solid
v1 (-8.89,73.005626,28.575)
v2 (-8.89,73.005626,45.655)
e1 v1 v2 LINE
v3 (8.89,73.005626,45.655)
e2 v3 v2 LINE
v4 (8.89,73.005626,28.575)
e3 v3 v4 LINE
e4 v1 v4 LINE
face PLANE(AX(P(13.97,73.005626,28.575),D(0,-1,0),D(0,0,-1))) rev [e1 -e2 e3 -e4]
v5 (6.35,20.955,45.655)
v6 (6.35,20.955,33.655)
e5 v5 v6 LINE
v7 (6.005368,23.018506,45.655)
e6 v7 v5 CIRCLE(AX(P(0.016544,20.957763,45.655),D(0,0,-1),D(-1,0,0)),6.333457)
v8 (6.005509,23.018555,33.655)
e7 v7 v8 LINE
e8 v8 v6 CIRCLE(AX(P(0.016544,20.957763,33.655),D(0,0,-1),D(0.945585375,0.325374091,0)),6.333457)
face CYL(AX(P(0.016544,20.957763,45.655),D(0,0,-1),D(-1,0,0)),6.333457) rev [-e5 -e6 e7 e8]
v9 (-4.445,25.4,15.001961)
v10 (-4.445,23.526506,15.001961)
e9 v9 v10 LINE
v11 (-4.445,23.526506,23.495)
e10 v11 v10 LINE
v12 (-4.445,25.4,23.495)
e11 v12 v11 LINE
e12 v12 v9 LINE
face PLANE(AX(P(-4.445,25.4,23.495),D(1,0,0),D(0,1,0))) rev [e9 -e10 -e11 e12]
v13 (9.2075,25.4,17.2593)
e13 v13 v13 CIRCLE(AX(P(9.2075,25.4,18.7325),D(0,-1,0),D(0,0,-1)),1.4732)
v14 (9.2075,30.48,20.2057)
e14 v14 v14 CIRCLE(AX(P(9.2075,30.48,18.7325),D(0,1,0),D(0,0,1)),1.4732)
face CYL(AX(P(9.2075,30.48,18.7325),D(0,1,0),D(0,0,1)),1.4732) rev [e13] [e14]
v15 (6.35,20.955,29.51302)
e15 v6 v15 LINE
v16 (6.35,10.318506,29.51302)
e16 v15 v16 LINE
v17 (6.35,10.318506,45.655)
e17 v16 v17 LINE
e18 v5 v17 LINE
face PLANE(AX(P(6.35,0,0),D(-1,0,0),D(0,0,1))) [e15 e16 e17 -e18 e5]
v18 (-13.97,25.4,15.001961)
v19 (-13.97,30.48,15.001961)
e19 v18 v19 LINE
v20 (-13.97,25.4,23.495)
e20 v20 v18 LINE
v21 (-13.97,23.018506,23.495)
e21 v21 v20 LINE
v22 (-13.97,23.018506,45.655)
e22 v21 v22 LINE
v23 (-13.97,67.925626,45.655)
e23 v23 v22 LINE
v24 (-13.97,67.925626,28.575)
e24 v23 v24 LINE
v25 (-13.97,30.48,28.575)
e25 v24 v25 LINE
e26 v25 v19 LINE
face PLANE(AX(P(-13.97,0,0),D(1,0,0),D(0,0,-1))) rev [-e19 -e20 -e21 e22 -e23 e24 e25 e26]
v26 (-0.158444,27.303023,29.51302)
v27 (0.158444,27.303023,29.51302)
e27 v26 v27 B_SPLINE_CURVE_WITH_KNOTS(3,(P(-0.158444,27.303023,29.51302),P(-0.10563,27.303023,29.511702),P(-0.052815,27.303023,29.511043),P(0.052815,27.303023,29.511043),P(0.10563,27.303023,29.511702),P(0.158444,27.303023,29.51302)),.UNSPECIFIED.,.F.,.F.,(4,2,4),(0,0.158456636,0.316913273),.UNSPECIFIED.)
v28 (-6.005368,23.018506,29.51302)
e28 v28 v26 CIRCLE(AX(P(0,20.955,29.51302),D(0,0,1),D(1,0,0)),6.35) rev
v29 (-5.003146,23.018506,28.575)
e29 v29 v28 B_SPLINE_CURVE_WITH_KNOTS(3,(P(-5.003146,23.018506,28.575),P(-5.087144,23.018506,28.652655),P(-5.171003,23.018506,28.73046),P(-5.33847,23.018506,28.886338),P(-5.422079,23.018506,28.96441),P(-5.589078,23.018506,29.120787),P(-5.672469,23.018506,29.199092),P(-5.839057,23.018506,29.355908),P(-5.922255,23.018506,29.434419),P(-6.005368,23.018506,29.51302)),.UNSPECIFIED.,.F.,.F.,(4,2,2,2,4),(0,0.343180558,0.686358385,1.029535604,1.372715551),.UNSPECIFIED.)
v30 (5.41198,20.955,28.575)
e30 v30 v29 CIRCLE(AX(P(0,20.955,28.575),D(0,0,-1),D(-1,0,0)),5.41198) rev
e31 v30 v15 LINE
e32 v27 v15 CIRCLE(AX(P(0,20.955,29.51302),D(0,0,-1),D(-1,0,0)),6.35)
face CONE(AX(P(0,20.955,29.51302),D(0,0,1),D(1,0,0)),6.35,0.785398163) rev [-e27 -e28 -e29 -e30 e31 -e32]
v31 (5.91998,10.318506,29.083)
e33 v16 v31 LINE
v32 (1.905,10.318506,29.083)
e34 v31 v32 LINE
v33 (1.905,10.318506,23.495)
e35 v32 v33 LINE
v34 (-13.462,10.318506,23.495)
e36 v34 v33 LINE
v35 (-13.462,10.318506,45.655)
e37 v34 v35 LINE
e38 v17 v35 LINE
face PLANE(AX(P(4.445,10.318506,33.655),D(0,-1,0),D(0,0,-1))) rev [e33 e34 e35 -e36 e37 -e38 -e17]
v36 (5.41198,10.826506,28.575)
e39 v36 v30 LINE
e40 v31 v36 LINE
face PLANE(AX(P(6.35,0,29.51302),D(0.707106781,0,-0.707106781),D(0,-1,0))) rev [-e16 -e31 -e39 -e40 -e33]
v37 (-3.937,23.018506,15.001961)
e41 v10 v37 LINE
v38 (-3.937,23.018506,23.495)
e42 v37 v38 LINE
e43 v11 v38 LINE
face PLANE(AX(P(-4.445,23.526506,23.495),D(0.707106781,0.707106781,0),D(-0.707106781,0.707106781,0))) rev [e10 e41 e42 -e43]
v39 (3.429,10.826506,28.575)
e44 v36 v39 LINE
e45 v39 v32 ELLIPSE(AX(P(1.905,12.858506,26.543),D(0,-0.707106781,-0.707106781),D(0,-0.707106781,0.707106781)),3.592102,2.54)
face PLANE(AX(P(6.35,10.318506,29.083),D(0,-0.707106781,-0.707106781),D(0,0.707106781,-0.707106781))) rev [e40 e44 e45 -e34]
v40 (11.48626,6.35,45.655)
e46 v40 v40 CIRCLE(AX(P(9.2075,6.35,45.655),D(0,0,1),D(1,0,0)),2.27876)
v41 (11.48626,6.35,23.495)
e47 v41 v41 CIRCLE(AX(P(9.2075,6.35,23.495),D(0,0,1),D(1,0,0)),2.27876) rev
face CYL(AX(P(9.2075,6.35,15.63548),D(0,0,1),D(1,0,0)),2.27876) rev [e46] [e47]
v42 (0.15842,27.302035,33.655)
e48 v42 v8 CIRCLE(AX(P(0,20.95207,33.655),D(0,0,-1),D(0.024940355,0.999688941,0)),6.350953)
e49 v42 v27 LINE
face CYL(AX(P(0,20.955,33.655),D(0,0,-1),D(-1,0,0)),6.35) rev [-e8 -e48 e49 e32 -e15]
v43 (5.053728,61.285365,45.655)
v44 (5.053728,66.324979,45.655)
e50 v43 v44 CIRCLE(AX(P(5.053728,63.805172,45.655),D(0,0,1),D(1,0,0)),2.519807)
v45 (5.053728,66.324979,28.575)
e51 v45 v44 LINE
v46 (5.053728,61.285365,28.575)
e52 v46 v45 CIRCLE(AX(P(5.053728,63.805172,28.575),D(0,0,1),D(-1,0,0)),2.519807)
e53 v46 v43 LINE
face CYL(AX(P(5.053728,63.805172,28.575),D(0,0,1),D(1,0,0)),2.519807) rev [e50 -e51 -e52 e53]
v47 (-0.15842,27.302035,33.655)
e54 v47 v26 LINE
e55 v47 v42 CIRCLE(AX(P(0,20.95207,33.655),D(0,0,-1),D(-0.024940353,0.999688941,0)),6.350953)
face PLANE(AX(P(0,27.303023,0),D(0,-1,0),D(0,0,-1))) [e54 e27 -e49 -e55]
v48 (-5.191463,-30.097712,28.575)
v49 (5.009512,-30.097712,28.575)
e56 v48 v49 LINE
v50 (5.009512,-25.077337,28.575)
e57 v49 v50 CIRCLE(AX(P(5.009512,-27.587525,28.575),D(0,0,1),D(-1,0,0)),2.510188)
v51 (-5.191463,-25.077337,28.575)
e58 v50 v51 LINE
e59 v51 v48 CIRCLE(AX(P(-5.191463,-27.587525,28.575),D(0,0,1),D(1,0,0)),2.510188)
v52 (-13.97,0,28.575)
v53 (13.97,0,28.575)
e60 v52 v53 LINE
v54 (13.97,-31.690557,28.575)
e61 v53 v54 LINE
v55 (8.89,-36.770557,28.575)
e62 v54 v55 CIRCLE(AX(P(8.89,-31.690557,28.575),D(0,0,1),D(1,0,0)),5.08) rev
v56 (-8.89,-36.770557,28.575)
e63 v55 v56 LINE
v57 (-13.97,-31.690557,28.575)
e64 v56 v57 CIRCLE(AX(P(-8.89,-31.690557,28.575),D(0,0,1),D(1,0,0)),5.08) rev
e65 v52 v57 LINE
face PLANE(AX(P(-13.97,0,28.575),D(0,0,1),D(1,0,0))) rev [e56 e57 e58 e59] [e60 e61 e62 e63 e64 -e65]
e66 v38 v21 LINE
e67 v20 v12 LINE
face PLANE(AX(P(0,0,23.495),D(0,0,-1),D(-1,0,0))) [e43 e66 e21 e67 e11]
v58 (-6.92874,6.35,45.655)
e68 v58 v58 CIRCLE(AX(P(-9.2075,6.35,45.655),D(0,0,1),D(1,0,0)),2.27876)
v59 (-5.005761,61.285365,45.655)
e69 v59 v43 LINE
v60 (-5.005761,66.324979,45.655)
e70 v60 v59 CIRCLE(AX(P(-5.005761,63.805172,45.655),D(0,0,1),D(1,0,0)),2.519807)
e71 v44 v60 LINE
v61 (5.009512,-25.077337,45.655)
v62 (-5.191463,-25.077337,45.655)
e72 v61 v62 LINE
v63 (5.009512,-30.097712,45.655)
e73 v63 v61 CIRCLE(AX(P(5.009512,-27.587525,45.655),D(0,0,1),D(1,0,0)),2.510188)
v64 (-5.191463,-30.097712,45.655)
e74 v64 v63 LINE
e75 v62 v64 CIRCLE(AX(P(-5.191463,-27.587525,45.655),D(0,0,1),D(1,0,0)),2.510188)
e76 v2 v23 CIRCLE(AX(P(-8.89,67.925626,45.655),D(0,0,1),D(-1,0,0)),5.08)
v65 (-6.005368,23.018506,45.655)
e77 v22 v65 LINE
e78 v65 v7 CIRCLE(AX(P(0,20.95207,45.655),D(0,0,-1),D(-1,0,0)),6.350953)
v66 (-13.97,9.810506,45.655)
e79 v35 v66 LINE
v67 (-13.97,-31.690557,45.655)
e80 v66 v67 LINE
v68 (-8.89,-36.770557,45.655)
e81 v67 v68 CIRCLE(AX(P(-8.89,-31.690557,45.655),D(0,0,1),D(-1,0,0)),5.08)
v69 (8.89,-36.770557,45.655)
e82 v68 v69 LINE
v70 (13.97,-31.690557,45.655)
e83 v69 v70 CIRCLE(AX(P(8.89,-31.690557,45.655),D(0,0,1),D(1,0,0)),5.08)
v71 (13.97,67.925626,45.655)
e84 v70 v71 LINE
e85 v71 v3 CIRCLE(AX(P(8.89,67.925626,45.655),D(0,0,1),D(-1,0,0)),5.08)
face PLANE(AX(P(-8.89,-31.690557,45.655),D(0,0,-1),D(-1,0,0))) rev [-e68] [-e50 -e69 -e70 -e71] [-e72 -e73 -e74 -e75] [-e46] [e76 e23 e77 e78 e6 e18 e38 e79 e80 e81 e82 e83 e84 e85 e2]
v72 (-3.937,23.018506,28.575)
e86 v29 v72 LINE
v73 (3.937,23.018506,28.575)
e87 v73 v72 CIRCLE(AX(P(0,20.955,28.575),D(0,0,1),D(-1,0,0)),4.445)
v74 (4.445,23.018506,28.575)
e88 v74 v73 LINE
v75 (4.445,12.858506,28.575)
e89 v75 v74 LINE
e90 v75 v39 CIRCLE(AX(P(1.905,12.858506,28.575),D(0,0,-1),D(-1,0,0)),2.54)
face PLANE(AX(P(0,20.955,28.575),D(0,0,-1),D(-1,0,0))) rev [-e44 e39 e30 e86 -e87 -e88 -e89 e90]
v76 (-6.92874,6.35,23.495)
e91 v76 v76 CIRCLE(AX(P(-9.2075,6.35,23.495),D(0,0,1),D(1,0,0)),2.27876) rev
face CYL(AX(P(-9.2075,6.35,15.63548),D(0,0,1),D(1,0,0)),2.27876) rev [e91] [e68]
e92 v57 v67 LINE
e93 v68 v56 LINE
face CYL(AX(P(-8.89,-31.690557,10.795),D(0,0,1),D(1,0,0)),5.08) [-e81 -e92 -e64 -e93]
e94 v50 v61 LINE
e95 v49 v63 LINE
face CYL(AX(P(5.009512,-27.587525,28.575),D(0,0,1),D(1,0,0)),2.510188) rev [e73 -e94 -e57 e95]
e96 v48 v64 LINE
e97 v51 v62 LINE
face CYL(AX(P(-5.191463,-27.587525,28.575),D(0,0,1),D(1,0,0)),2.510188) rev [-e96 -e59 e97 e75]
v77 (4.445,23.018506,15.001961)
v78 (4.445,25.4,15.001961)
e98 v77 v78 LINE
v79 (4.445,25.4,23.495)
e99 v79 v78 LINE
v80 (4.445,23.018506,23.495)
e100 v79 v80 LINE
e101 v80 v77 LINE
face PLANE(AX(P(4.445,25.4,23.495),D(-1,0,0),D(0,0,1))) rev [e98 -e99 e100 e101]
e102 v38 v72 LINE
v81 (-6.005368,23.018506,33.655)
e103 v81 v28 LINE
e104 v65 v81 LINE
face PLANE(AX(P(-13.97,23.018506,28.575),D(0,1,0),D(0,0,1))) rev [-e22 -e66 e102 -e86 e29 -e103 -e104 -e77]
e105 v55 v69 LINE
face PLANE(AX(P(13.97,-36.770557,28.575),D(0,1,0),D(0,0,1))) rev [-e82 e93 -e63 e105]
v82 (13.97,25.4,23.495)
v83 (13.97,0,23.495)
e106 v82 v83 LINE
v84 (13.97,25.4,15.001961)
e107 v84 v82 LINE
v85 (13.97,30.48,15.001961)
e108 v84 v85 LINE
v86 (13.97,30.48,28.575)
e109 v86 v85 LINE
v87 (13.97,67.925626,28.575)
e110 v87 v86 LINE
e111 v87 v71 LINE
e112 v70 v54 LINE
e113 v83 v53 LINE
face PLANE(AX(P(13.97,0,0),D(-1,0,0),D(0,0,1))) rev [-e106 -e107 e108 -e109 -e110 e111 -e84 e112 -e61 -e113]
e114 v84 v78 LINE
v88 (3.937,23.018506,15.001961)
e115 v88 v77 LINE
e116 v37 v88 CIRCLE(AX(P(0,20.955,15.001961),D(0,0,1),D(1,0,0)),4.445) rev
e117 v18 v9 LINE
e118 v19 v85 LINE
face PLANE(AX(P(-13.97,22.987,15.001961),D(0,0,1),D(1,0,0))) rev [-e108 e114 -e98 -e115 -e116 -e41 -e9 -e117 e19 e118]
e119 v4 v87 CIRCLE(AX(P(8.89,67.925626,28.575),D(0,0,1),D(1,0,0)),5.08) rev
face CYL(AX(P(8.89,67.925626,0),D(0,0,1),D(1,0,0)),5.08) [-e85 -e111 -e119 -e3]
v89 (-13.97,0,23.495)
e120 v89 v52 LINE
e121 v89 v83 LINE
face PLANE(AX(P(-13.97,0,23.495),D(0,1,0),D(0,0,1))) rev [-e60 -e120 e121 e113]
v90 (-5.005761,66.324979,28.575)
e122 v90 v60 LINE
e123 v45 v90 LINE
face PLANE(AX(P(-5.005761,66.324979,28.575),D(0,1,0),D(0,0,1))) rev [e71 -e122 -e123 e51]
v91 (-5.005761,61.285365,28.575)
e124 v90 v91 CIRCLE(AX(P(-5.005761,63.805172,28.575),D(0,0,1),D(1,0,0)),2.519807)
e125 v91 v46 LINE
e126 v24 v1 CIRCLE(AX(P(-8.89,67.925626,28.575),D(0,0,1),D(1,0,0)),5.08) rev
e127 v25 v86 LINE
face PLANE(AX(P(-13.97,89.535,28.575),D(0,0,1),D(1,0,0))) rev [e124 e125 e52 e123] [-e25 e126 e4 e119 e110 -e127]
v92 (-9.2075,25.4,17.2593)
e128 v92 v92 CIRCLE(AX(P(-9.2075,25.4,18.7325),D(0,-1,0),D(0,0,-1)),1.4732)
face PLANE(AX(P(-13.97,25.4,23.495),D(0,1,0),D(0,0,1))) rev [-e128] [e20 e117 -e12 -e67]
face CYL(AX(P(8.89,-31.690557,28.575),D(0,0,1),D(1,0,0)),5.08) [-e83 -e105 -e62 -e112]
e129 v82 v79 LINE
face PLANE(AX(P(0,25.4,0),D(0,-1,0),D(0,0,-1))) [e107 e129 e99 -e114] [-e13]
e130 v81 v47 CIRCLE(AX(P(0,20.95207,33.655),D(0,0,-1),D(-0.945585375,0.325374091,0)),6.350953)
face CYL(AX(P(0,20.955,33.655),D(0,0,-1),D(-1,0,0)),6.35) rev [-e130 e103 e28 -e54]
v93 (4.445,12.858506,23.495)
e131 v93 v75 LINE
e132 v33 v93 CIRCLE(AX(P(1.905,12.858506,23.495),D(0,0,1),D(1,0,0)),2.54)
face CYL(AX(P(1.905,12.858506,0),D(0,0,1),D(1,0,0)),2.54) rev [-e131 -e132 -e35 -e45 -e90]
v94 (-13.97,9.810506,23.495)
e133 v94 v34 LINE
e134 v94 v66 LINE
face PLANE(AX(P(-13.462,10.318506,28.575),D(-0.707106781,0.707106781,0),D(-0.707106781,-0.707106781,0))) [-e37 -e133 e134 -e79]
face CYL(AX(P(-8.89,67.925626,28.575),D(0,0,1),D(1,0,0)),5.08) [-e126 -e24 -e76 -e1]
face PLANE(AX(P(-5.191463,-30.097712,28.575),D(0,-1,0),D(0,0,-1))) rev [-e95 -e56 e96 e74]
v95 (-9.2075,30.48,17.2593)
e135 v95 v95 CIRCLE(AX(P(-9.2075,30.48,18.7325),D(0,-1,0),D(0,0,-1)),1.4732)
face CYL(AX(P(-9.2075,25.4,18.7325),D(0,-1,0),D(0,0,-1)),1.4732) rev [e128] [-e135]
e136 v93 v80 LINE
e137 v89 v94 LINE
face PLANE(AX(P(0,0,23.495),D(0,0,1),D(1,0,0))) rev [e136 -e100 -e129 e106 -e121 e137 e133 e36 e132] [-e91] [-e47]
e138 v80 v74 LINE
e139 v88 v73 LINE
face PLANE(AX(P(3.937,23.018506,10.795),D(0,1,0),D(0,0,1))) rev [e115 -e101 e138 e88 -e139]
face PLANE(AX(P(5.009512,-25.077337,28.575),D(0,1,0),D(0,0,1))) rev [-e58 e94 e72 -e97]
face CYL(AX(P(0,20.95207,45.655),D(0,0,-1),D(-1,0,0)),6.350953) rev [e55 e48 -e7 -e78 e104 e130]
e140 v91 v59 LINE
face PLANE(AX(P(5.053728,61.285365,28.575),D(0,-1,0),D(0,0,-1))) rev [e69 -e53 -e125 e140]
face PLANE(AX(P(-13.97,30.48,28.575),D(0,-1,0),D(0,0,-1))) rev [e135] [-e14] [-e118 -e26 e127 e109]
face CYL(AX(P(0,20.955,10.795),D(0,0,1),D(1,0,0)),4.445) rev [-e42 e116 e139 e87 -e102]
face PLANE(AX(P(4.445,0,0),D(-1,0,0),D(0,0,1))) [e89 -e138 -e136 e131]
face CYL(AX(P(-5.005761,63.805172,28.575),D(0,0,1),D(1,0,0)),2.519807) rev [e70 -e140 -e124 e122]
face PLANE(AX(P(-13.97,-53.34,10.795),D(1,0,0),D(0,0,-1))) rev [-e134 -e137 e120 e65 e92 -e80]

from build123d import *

# Parameters (mm, degrees)
BOSS_EXTRUDE1_DEPTH                                = 5.080000000000001
SKETCH2_W                                          = 5.079999999999998
SKETCH2_H                                          = 0.5079999999999831
BOSS_EXTRUDE2_DEPTH                                = 17.907000000000004
BOSS_EXTRUDE3_DEPTH                                = 1.9049999999999987
BOSS_EXTRUDE4_DEPTH                                = 17.779999999999998
SKETCH5_W                                          = 20.31999999999999
SKETCH5_H                                          = 22.859999999999992
BOSS_EXTRUDE5_DEPTH                                = 63.1505057547775
BOSS_EXTRUDE6_DEPTH                                = 10.03299999999999
BOSS_EXTRUDE7_DEPTH                                = 5.079999999999997
SKETCH8_W                                          = 22.859999999999992
SKETCH8_H                                          = 80.6430229523153
BOSS_EXTRUDE8_DEPTH                                = 7.619999999999997
CUT_EXTRUDE1_DEPTH                                 = 12.699999999999996
CUT_EXTRUDE2_DEPTH                                 = 12.699999999999998
BOSS_EXTRUDE9_DEPTH                                = 5.079999999999997
BOSS_EXTRUDE10_DEPTH                               = 62.23197704768469
SKETCH13_W                                         = 9.524999999999991
SKETCH13_H                                         = 12.699999999999998
CUT_EXTRUDE3_DEPTH                                 = 2.381494245222503
SKETCH14_W                                         = 17.779999999999994
SKETCH14_H                                         = 59.05499999999999
CUT_EXTRUDE4_DEPTH                                 = 100.64847640581364
SKETCH15_W                                         = 5.079999999999998
SKETCH15_H                                         = 53.339999999999996
CUT_EXTRUDE5_DEPTH                                 = 100.64847640581364
CUT_EXTRUDE6_DEPTH                                 = 93.34611808300336
CUT_EXTRUDE7_DEPTH                                 = 94.45724543875664
CUT_EXTRUDE8_DEPTH                                 = 93.34611808300336
CUT_EXTRUDE9_DEPTH                                 = 93.34611808300336
CBORE_FOR_M2_5_HEX_HEAD_MACHINE_SCREW1_D           = 2.9464
CBORE_FOR_M2_5_HEX_HEAD_MACHINE_SCREW1_DEPTH       = 22.86
CBORE_FOR_M2_5_HEX_HEAD_MACHINE_SCREW1_CBORE_D     = 5.55752
CBORE_FOR_M2_5_HEX_HEAD_MACHINE_SCREW1_CBORE_DEPTH = 2.8448
M2_5_CLEARANCE_HOLE1_D                             = 2.9464
M2_5_CLEARANCE_HOLE1_DEPTH                         = 83.82
M2_5_CLEARANCE_HOLE2_D                             = 2.9464
M2_5_CLEARANCE_HOLE2_DEPTH                         = 64.135
FILLET2_R                                          = 2.540000000000001
CHAMFER2_SIZE                                      = 0.938019803
FILLET3_R                                          = 5.079999999999999
BOSS_EXTRUDE16_DEPTH                               = 5.080000000000002
SKETCH33_W                                         = 27.93999999999999
SKETCH33_H                                         = 16.56944292798444
CUT_EXTRUDE10_DEPTH                                = 5.080000000000002
BOSS_EXTRUDE17_START                               = -5.080000000000002
BOSS_EXTRUDE17_DEPTH                               = 5.080000000000002
SKETCH35_W                                         = 27.940000000000005
SKETCH35_H                                         = 16.529374070210466
CUT_EXTRUDE11_DEPTH                                = 5.08
CUT_EXTRUDE12_DEPTH                                = 5.08
FILLET4_R                                          = 5.08
FILLET5_R                                          = 5.08
FILLET6_R                                          = 5.08
FILLET7_R                                          = 5.08
CUT_EXTRUDE13_DEPTH                                = 5.08
SKETCH39_W                                         = 27.940000000000005
SKETCH39_H                                         = 3.5882356704365357
CUT_EXTRUDE14_DEPTH                                = 7.492999999999999
SKETCH40_W                                         = 27.940000000000005
SKETCH40_H                                         = 0.6187251467707799
CUT_EXTRUDE15_DEPTH                                = 7.492999999999999
BOSS_EXTRUDE18_START                               = 12
SKETCH41_R                                         = 2.7787599999999943
BOSS_EXTRUDE18_DEPTH                               = 12
SKETCH42_R                                         = 2.7787599999999943
CUT_EXTRUDE16_DEPTH                                = 32.512
SKETCH43_R                                         = 2.7787599999999935
SKETCH43_R_2                                       = 2.2787599999999935
SKETCH43_R_3                                       = 2.7787599999999943
BOSS_EXTRUDE19_DEPTH                               = 22.16


with BuildPart() as part:
    # Sketch1 → Boss-Extrude1 (new body)
    with BuildSketch(Plane.XY.offset(33.654999999999994)):
        Polygon((-13.96999999999999, 9.810505754777516), (-13.461999999999998, 9.810505754777516), (-13.461999999999998, 10.3185057547775), align=None)
    extrude(amount=-BOSS_EXTRUDE1_DEPTH)

    # Sketch2 → Boss-Extrude2 (add)
    with BuildSketch(Plane(origin=(-13.461999999999998, 0, 0), x_dir=(0, 0, -1), z_dir=(1, 0, 0))):
        with Locations((-31.114999999999995, 10.064505754777507)):
            Rectangle(SKETCH2_W, SKETCH2_H)
    extrude(amount=BOSS_EXTRUDE2_DEPTH)

    # Sketch3 → Boss-Extrude3 (add)
    with BuildSketch(Plane(origin=(4.445000000000005, 0, 0), x_dir=(0, 0, -1), z_dir=(1, 0, 0))):
        Polygon((-28.574999999999996, 9.810505754777516), (-33.654999999999994, 9.810505754777516), (-33.654999999999994, 10.3185057547775), (-29.083000000000002, 10.3185057547775), (-28.574999999999996, 10.826505754777498), align=None)
    extrude(amount=BOSS_EXTRUDE3_DEPTH)

    # Sketch4 → Boss-Extrude4 (add)
    with BuildSketch(Plane(origin=(0, 0, 28.574999999999996), x_dir=(-1, 0, 0), z_dir=(0, 0, -1))):
        with BuildLine():
            Line((-6.3500000000000005, 9.810505754777516), (-6.349999999999998, 27.303022952315306))
            Line((-6.349999999999998, 27.303022952315306), (3.93700000000001, 27.303022952315306))
            Line((3.93700000000001, 27.303022952315306), (3.93700000000001, 23.0185057547775))
            ThreePointArc((3.93700000000001, 23.0185057547775), (-2.14e-15, 25.399999999999995), (-3.9370000000000167, 23.0185057547775))
            Line((-3.9370000000000167, 23.0185057547775), (-4.445000000000012, 23.0185057547775))
            Line((-4.445000000000012, 23.0185057547775), (-4.445000000000001, 10.3185057547775))
            Line((-4.445000000000001, 10.3185057547775), (13.46200000000004, 10.3185057547775))
            Line((13.46200000000004, 10.3185057547775), (13.969999999999992, 9.810505754777516))
            Line((13.969999999999992, 9.810505754777516), (-6.3500000000000005, 9.810505754777516))
        make_face()
    extrude(amount=BOSS_EXTRUDE4_DEPTH)

    # Sketch5 → Boss-Extrude5 (add)
    with BuildSketch(Plane.XZ.offset(-9.810505754777516)):
        with Locations((-3.8099999999999947, 22.224999999999998)):
            Rectangle(SKETCH5_W, SKETCH5_H)
    extrude(amount=BOSS_EXTRUDE5_DEPTH)

    # Sketch6 → Boss-Extrude6 (add)
    with BuildSketch(Plane.ZY.offset(3.93700000000001)):
        Polygon((28.575, 23.0185057547775), (10.795, 23.0185057547775), (10.794999999999998, 27.303022952315306), (28.575, 27.303022952315306), align=None)
    extrude(amount=BOSS_EXTRUDE6_DEPTH)

    # Sketch7 → Boss-Extrude7 (add)
    with BuildSketch(Plane.XY.offset(28.574999999999996)):
        with BuildLine():
            Line((0.15844430213195376, 27.303022952315306), (6.3500000000000005, 27.303022952315306))
            Line((6.3500000000000005, 27.303022952315306), (6.3500000000000005, 20.955000000000002))
            ThreePointArc((6.3500000000000005, 20.955000000000002), (4.545801432010527, 25.38875566994067), (0.15844430213195376, 27.303022952315306))
        make_face()
    extrude(amount=BOSS_EXTRUDE7_DEPTH)

    # Sketch8 → Boss-Extrude8 (add)
    with BuildSketch(Plane(origin=(6.350000000000003, 0, 0), x_dir=(0, 0, -1), z_dir=(1, 0, 0))):
        with Locations((-22.224999999999998, -13.018488523842345)):
            Rectangle(SKETCH8_W, SKETCH8_H)
    extrude(amount=BOSS_EXTRUDE8_DEPTH)

    # Sketch9 → Cut-Extrude1 (cut)
    with BuildSketch(Plane(origin=(0, 0, 10.794999999999998), x_dir=(-1, 0, 0), z_dir=(0, 0, -1))):
        Polygon((13.97, 25.4), (4.44500000000001, 25.4), (4.445000000000009, 23.526505754777506), (3.9369999999999985, 23.0185057547775), (13.97, 23.0185057547775), align=None)
    extrude(amount=-CUT_EXTRUDE1_DEPTH, mode=Mode.SUBTRACT)

    # Sketch10 → Cut-Extrude2 (cut)
    with BuildSketch(Plane(origin=(0, 0, 10.794999999999998), x_dir=(-1, 0, 0), z_dir=(0, 0, -1))):
        Polygon((-4.445000000000001, 10.3185057547775), (-4.44500000000001, 23.018505754777497), (-13.97, 23.018505754777497), (-13.97, -53.339999999999996), (13.969999999999992, -53.339999999999996), (13.970000000000004, 9.81050575477752), (13.46200000000004, 10.3185057547775), align=None)
    extrude(amount=-CUT_EXTRUDE2_DEPTH, mode=Mode.SUBTRACT)

    # Sketch11 → Boss-Extrude9 (add)
    with BuildSketch(Plane.XY.offset(28.574999999999996)):
        with BuildLine():
            Line((-6.005367932108752, 23.0185057547775), (-13.97, 23.0185057547775))
            Line((-13.97, 23.0185057547775), (-13.97, 27.303022952315306))
            Line((-13.97, 27.303022952315306), (-0.15844430213195376, 27.303022952315306))
            ThreePointArc((-0.15844430213195376, 27.303022952315306), (-3.7533208254481982, 26.077019404615417), (-6.005367932108752, 23.0185057547775))
        make_face()
    extrude(amount=BOSS_EXTRUDE9_DEPTH)

    # Sketch12 → Boss-Extrude10 (add)
    with BuildSketch(Plane(origin=(0, 27.303022952315306, 0), x_dir=(-1, 0, 0), z_dir=(0, 1, 0))):
        Polygon((-13.97, 33.654999999999994), (13.97, 33.654999999999994), (13.97, 10.794999999999998), (-13.97, 10.795), align=None)
    extrude(amount=BOSS_EXTRUDE10_DEPTH)

    # Sketch13 → Cut-Extrude3 (cut)
    with BuildSketch(Plane.XZ.offset(-23.0185057547775)):
        with Locations((9.207500000000005, 17.145)):
            Rectangle(SKETCH13_W, SKETCH13_H)
    extrude(amount=-CUT_EXTRUDE3_DEPTH, mode=Mode.SUBTRACT)

    # Sketch14 → Cut-Extrude4 (cut, through all)
    with BuildSketch(Plane(origin=(13.97, 0, 0), x_dir=(0, 0, -1), z_dir=(1, 0, 0))):
        with Locations((-19.685, 60.0075)):
            Rectangle(SKETCH14_W, SKETCH14_H)
    extrude(amount=-CUT_EXTRUDE4_DEPTH, mode=Mode.SUBTRACT)

    # Sketch15 → Cut-Extrude5 (cut, through all)
    with BuildSketch(Plane(origin=(13.97, 0, 0), x_dir=(0, 0, -1), z_dir=(1, 0, 0))):
        with Locations((-26.034999999999997, -26.669999999999998)):
            Rectangle(SKETCH15_W, SKETCH15_H)
    extrude(amount=-CUT_EXTRUDE5_DEPTH, mode=Mode.SUBTRACT)

    # Sketch16 → Cut-Extrude6 (cut, through all)
    with BuildSketch(Plane(origin=(0, 0, 28.575), x_dir=(-1, 0, 0), z_dir=(0, 0, -1))):
        with BuildLine():
            Line((5.08, -41.592499999999994), (-5.08, -41.592499999999994))
            ThreePointArc((-5.08, -41.592499999999994), (-7.620000000000006, -44.1325), (-5.08, -46.6725))
            Line((-5.08, -46.6725), (5.08, -46.6725))
            ThreePointArc((5.08, -46.6725), (7.619999999999999, -44.1325), (5.08, -41.592499999999994))
        make_face()
    extrude(amount=-CUT_EXTRUDE6_DEPTH, mode=Mode.SUBTRACT)

    # Sketch17 → Cut-Extrude7 (cut, through all)
    with BuildSketch(Plane.XY.offset(33.654999999999994)):
        with BuildLine():
            Line((-5.08, -38.4175), (5.08, -38.4175))
            ThreePointArc((5.08, -38.4175), (7.619999999999999, -35.8775), (5.08, -33.3375))
            Line((5.08, -33.3375), (-5.08, -33.3375))
            ThreePointArc((-5.08, -33.3375), (-7.619999999999999, -35.8775), (-5.08, -38.4175))
        make_face()
    extrude(amount=-CUT_EXTRUDE7_DEPTH, mode=Mode.SUBTRACT)

    # Sketch18 → Cut-Extrude8 (cut, through all)
    with BuildSketch(Plane(origin=(0, 0, 28.575), x_dir=(-1, 0, 0), z_dir=(0, 0, -1))):
        with BuildLine():
            Line((5.08, 73.9775), (-5.08, 73.9775))
            ThreePointArc((-5.08, 73.9775), (-7.620000000000006, 71.4375), (-5.08, 68.8975))
            Line((-5.08, 68.8975), (5.08, 68.8975))
            ThreePointArc((5.08, 68.8975), (7.620000000000006, 71.4375), (5.08, 73.9775))
        make_face()
    extrude(amount=-CUT_EXTRUDE8_DEPTH, mode=Mode.SUBTRACT)

    # Sketch19 → Cut-Extrude9 (cut, through all)
    with BuildSketch(Plane(origin=(0, 0, 28.575), x_dir=(-1, 0, 0), z_dir=(0, 0, -1))):
        with BuildLine():
            Line((5.08, 82.2325), (-5.08, 82.2325))
            ThreePointArc((-5.08, 82.2325), (-7.620000000000006, 79.6925), (-5.08, 77.1525))
            Line((-5.08, 77.1525), (5.08, 77.1525))
            ThreePointArc((5.08, 77.1525), (7.619999999999992, 79.6925), (5.08, 82.2325))
        make_face()
    extrude(amount=-CUT_EXTRUDE9_DEPTH, mode=Mode.SUBTRACT)

    # CBORE for M2.5 Hex Head Machine Screw1
    with Locations(Plane.XY.offset(33.654999999999994)):
        with Locations((9.2075, 6.35), (-9.2075, 6.35)):
            CounterBoreHole(CBORE_FOR_M2_5_HEX_HEAD_MACHINE_SCREW1_D / 2, CBORE_FOR_M2_5_HEX_HEAD_MACHINE_SCREW1_CBORE_D / 2, CBORE_FOR_M2_5_HEX_HEAD_MACHINE_SCREW1_CBORE_DEPTH, depth=CBORE_FOR_M2_5_HEX_HEAD_MACHINE_SCREW1_DEPTH)

    # M2.5 Clearance Hole1
    with Locations(Plane(origin=(0, 30.48, 0), x_dir=(1, 0, 0), z_dir=(0, 1, 0))):
        with Locations((9.2075, -18.7325)):
            Hole(M2_5_CLEARANCE_HOLE1_D / 2, depth=M2_5_CLEARANCE_HOLE1_DEPTH)

    # M2.5 Clearance Hole2
    with Locations(Plane(origin=(0, 25.4, 0), x_dir=(-1, 0, 0), z_dir=(0, -1, 0))):
        with Locations((9.2075, -18.7325)):
            Hole(M2_5_CLEARANCE_HOLE2_D / 2, depth=M2_5_CLEARANCE_HOLE2_DEPTH)

    # Fillet2
    fillet2_edges = [part.edges().sort_by_distance(p)[0] for p in [
        (4.445000000000004, 10.3185057547775, 26.289),
    ]]
    fillet(fillet2_edges, radius=FILLET2_R)

    # Chamfer2
    # the kernel refuses this chamfer: 0.938019803 mm, written as the material it adds along each edge
    with BuildSketch(Plane(origin=(3.44e-15, 20.955, 28.574999999999996), x_dir=(0.3476137543318691, 0.9376378180295966, 0), z_dir=(0.9376378180295966, -0.3476137543318691, 0))) as chamfer2_piece_1_section:
        Polygon((6.349999999999995 - CHAMFER2_SIZE, 0), (6.350000000000003, CHAMFER2_SIZE), (6.349999999999995, 0), align=None)
    chamfer2_piece_1 = revolve(axis=Axis((3.44e-15, 20.955, 28.574999999999996), (0, 0, 1)), revolution_arc=113.14940178409387, mode=Mode.PRIVATE)
    chamfer2_piece_1 = split(chamfer2_piece_1, bisect_by=Plane(origin=(-2.526546800118106, 23.0185057547775, 29.032255606191857), z_dir=(0, 1, 0)), keep=Keep.TOP, mode=Mode.PRIVATE)
    add(chamfer2_piece_1)
    with BuildSketch(Plane(origin=(6.350000000000003, 8.4142161862341, 28.574999999999996), x_dir=(0.027495876610586452, 0, 0.9996219169112966), z_dir=(-1.5e-16, 1, 0))) as chamfer2_piece_2:
        Polygon((CHAMFER2_SIZE * 0.999621916411, -CHAMFER2_SIZE * 0.0274958765968), (-CHAMFER2_SIZE * 0.0274958765968, -CHAMFER2_SIZE * 0.999621916411), (0, 0), align=None)
    extrude(amount=12.540783813765902)
    with BuildSketch(Plane(origin=(-2e-15, 20.955, 28.574999999999996), x_dir=(1, 5.6e-16, 0), z_dir=(5.6e-16, -1, 0))) as chamfer2_piece_3:
        Polygon((6.350000000000002 - CHAMFER2_SIZE, 0), (6.350000000000002, CHAMFER2_SIZE), (6.350000000000002, 0), align=None)
    revolve(axis=Axis((-2e-15, 20.955, 28.574999999999996), (0, 0, 1)), revolution_arc=110.34466934043498)

    # Fillet3
    fillet3_edges = [part.edges().sort_by_distance(p)[0] for p in [
        (13.97, -53.339999999999996, 31.114999999999995),
        (13.97, 89.535, 31.114999999999995),
        (-13.97, 89.535, 31.114999999999995),
        (-13.96999999999999, -53.33999999999998, 31.114999999999995),
    ]]
    fillet(fillet3_edges, radius=FILLET3_R)

    # Sketch31 → Boss-Extrude16 (add)
    with BuildSketch(Plane.XY.offset(33.654999999999994)):
        with BuildLine():
            Line((-5.079999999999973, -38.4175), (5.08, -38.4175))
            ThreePointArc((5.08, -38.4175), (7.620000000000003, -35.8775), (5.08, -33.3375))
            Line((5.08, -33.3375), (-5.08, -33.3375))
            ThreePointArc((-5.08, -33.3375), (-7.6199999999999966, -35.87750000000001), (-5.079999999999973, -38.4175))
        make_face()
    extrude(amount=-BOSS_EXTRUDE16_DEPTH)

    # Sketch33 → Cut-Extrude10 (cut)
    with BuildSketch(Plane.XY.offset(33.654999999999994)):
        with Locations((5.33e-15, -45.05527853600776)):
            Rectangle(SKETCH33_W, SKETCH33_H)
    extrude(amount=-CUT_EXTRUDE10_DEPTH, mode=Mode.SUBTRACT)

    # Sketch34 → Boss-Extrude17 (add)
    with BuildSketch(Plane.XY.offset(33.654999999999994).offset(BOSS_EXTRUDE17_START)):
        with BuildLine():
            Line((-5.08, 73.9775), (5.079999999999992, 73.9775))
            ThreePointArc((5.079999999999992, 73.9775), (7.620000000000014, 71.43750000000001), (5.080000000000028, 68.8975))
            Line((5.080000000000028, 68.8975), (-5.08, 68.8975))
            ThreePointArc((-5.08, 68.8975), (-7.620000000000005, 71.4375), (-5.08, 73.9775))
        make_face()
    extrude(amount=BOSS_EXTRUDE17_DEPTH)

    # Sketch35 → Cut-Extrude11 (cut)
    with BuildSketch(Plane.XY.offset(33.654999999999994)):
        with Locations((-1.78e-15, 81.27031296489477)):
            Rectangle(SKETCH35_W, SKETCH35_H)
    extrude(amount=-CUT_EXTRUDE11_DEPTH, mode=Mode.SUBTRACT)

    # Sketch37 → Cut-Extrude12 (cut)
    with BuildSketch(Plane.XY.offset(33.654999999999994)):
        with BuildLine():
            Line((5.053727927387616, 61.28536545923424), (-5.0057610573760645, 61.28536545923424))
            ThreePointArc((-5.0057610573760645, 61.28536545923424), (-7.525567786090294, 63.805172187948486), (-5.0057610573760645, 66.32497891666272))
            Line((-5.0057610573760645, 66.32497891666272), (5.053727927387616, 66.32497891666272))
            ThreePointArc((5.053727927387616, 66.32497891666272), (7.573534656101845, 63.805172187948486), (5.053727927387616, 61.28536545923424))
        make_face()
    extrude(amount=-CUT_EXTRUDE12_DEPTH, mode=Mode.SUBTRACT)

    # Fillet4
    fillet4_edges = [part.edges().sort_by_distance(p)[0] for p in [
        (13.97, 73.00562592978953, 31.114999999999995),
    ]]
    fillet(fillet4_edges, radius=FILLET4_R)

    # Fillet5
    fillet5_edges = [part.edges().sort_by_distance(p)[0] for p in [
        (-13.970000000000002, 73.00562592978953, 31.114999999999995),
    ]]
    fillet(fillet5_edges, radius=FILLET5_R)

    # Fillet6
    fillet6_edges = [part.edges().sort_by_distance(p)[0] for p in [
        (13.97, -36.77055707201554, 31.114999999999995),
    ]]
    fillet(fillet6_edges, radius=FILLET6_R)

    # Fillet7
    fillet7_edges = [part.edges().sort_by_distance(p)[0] for p in [
        (-13.96999999999999, -36.77055707201554, 31.114999999999995),
    ]]
    fillet(fillet7_edges, radius=FILLET7_R)

    # Sketch38 → Cut-Extrude13 (cut)
    with BuildSketch(Plane.XY.offset(33.654999999999994)):
        with BuildLine():
            Line((5.0095124991452185, -25.077337252068435), (-5.191462732995735, -25.077337252068435))
            ThreePointArc((-5.191462732995735, -25.077337252068435), (-7.701650355564446, -27.58752487463715), (-5.191462732995735, -30.09771249720587))
            Line((-5.191462732995735, -30.09771249720587), (5.0095124991452185, -30.09771249720587))
            ThreePointArc((5.0095124991452185, -30.09771249720587), (7.519700121713935, -27.58752487463715), (5.0095124991452185, -25.077337252068435))
        make_face()
    extrude(amount=-CUT_EXTRUDE13_DEPTH, mode=Mode.SUBTRACT)

    # Sketch39 → Cut-Extrude14 (cut)
    with BuildSketch(Plane(origin=(0, 30.48, 0), x_dir=(1, 0, 0), z_dir=(0, 1, 0))):
        with Locations((-2.66e-15, -12.589117835218268)):
            Rectangle(SKETCH39_W, SKETCH39_H)
    extrude(amount=-CUT_EXTRUDE14_DEPTH, mode=Mode.SUBTRACT)

    # Sketch40 → Cut-Extrude15 (cut)
    with BuildSketch(Plane(origin=(0, 30.48, 0), x_dir=(1, 0, 0), z_dir=(0, 1, 0))):
        with Locations((-2.66e-15, -14.692598243821926)):
            Rectangle(SKETCH40_W, SKETCH40_H)
    extrude(amount=-CUT_EXTRUDE15_DEPTH, mode=Mode.SUBTRACT)

    # Sketch41 → Boss-Extrude18 (add)
    with BuildSketch(Plane.XY.offset(33.654999999999994).offset(BOSS_EXTRUDE18_START)):
        with BuildLine():
            Line((-8.889999999999963, -36.77055707201554), (8.889999999999963, -36.77055707201554))
            ThreePointArc((8.889999999999963, -36.77055707201554), (12.48210244842766, -35.282659520443204), (13.97, -31.690557072015505))
            Line((13.97, -31.690557072015505), (13.97, 67.92562592978949))
            ThreePointArc((13.97, 67.92562592978949), (12.48210244842766, 71.51772837821719), (8.889999999999963, 73.00562592978953))
            Line((8.889999999999963, 73.00562592978953), (-8.889999999999963, 73.00562592978953))
            ThreePointArc((-8.889999999999963, 73.00562592978953), (-12.482102448427664, 71.51772837821719), (-13.97, 67.92562592978949))
            Line((-13.97, 67.92562592978949), (-13.97, 23.0185057547775))
            Line((-13.97, 23.0185057547775), (-6.005367932108752, 23.0185057547775))
            ThreePointArc((-6.005367932108752, 23.0185057547775), (1.26e-15, 27.30302295231531), (6.005367932108753, 23.0185057547775))
            ThreePointArc((6.005367932108753, 23.0185057547775), (6.26347602080808, 22.001081256735382), (6.350000000000003, 20.955000000000002))
            Line((6.350000000000003, 20.955000000000002), (6.350000000000003, 10.318505754777496))
            Line((6.350000000000003, 10.318505754777496), (1.9050000000000302, 10.318505754777497))
            Line((1.9050000000000302, 10.318505754777497), (-13.461999999999998, 10.3185057547775))
            Line((-13.461999999999998, 10.3185057547775), (-13.96999999999999, 9.810505754777516))
            Line((-13.96999999999999, 9.810505754777516), (-13.97, -31.690557072015505))
            ThreePointArc((-13.97, -31.690557072015505), (-12.48210244842766, -35.282659520443204), (-8.889999999999963, -36.77055707201554))
        make_face()
        with Locations((-9.2075, 6.35)):
            Circle(SKETCH41_R, mode=Mode.SUBTRACT)
        with Locations((9.2075, 6.35)):
            Circle(SKETCH41_R, mode=Mode.SUBTRACT)
        with BuildLine():
            Line((-5.0057610573760645, 66.32497891666272), (5.053727927387616, 66.32497891666272))
            ThreePointArc((5.053727927387616, 66.32497891666272), (7.573534656101845, 63.805172187948486), (5.053727927387616, 61.28536545923426))
            Line((5.053727927387616, 61.28536545923426), (-5.0057610573760645, 61.28536545923426))
            ThreePointArc((-5.0057610573760645, 61.28536545923426), (-7.525567786090294, 63.805172187948486), (-5.0057610573760645, 66.32497891666272))
        make_face(mode=Mode.SUBTRACT)
        with BuildLine():
            Line((5.0095124991452185, -30.09771249720587), (-5.191462732995739, -30.097712497205865))
            ThreePointArc((-5.191462732995739, -30.097712497205865), (-7.701650355564454, -27.58752487463715), (-5.191462732995739, -25.077337252068435))
            Line((-5.191462732995739, -25.077337252068435), (5.009512499145212, -25.077337252068435))
            ThreePointArc((5.009512499145212, -25.077337252068435), (7.519700121713934, -27.587524874637147), (5.0095124991452185, -30.09771249720587))
        make_face(mode=Mode.SUBTRACT)
    extrude(amount=-BOSS_EXTRUDE18_DEPTH)

    # Sketch42 → Cut-Extrude16 (cut)
    with BuildSketch(Plane.XY.offset(45.655)):
        with Locations((-9.2075, 6.35)):
            Circle(SKETCH42_R)
        with Locations((9.2075, 6.35)):
            Circle(SKETCH42_R)
    extrude(amount=-CUT_EXTRUDE16_DEPTH, mode=Mode.SUBTRACT)

    # Sketch43 → Boss-Extrude19 (add)
    # profile 1 of 2: a face of its own
    with BuildSketch(Plane.XY.offset(45.655)):
        with Locations((-9.2075, 6.35)):
            Circle(SKETCH43_R)
        with Locations((-9.2075, 6.35)):
            Circle(SKETCH43_R_2, mode=Mode.SUBTRACT)
    # profile 2 of 2: a face of its own
    with BuildSketch(Plane.XY.offset(45.655)):
        with Locations((9.2075, 6.35)):
            Circle(SKETCH43_R_3)
        with Locations((9.2075, 6.35)):
            Circle(SKETCH43_R_2, mode=Mode.SUBTRACT)
    extrude(amount=-BOSS_EXTRUDE19_DEPTH)


solid = part.part
